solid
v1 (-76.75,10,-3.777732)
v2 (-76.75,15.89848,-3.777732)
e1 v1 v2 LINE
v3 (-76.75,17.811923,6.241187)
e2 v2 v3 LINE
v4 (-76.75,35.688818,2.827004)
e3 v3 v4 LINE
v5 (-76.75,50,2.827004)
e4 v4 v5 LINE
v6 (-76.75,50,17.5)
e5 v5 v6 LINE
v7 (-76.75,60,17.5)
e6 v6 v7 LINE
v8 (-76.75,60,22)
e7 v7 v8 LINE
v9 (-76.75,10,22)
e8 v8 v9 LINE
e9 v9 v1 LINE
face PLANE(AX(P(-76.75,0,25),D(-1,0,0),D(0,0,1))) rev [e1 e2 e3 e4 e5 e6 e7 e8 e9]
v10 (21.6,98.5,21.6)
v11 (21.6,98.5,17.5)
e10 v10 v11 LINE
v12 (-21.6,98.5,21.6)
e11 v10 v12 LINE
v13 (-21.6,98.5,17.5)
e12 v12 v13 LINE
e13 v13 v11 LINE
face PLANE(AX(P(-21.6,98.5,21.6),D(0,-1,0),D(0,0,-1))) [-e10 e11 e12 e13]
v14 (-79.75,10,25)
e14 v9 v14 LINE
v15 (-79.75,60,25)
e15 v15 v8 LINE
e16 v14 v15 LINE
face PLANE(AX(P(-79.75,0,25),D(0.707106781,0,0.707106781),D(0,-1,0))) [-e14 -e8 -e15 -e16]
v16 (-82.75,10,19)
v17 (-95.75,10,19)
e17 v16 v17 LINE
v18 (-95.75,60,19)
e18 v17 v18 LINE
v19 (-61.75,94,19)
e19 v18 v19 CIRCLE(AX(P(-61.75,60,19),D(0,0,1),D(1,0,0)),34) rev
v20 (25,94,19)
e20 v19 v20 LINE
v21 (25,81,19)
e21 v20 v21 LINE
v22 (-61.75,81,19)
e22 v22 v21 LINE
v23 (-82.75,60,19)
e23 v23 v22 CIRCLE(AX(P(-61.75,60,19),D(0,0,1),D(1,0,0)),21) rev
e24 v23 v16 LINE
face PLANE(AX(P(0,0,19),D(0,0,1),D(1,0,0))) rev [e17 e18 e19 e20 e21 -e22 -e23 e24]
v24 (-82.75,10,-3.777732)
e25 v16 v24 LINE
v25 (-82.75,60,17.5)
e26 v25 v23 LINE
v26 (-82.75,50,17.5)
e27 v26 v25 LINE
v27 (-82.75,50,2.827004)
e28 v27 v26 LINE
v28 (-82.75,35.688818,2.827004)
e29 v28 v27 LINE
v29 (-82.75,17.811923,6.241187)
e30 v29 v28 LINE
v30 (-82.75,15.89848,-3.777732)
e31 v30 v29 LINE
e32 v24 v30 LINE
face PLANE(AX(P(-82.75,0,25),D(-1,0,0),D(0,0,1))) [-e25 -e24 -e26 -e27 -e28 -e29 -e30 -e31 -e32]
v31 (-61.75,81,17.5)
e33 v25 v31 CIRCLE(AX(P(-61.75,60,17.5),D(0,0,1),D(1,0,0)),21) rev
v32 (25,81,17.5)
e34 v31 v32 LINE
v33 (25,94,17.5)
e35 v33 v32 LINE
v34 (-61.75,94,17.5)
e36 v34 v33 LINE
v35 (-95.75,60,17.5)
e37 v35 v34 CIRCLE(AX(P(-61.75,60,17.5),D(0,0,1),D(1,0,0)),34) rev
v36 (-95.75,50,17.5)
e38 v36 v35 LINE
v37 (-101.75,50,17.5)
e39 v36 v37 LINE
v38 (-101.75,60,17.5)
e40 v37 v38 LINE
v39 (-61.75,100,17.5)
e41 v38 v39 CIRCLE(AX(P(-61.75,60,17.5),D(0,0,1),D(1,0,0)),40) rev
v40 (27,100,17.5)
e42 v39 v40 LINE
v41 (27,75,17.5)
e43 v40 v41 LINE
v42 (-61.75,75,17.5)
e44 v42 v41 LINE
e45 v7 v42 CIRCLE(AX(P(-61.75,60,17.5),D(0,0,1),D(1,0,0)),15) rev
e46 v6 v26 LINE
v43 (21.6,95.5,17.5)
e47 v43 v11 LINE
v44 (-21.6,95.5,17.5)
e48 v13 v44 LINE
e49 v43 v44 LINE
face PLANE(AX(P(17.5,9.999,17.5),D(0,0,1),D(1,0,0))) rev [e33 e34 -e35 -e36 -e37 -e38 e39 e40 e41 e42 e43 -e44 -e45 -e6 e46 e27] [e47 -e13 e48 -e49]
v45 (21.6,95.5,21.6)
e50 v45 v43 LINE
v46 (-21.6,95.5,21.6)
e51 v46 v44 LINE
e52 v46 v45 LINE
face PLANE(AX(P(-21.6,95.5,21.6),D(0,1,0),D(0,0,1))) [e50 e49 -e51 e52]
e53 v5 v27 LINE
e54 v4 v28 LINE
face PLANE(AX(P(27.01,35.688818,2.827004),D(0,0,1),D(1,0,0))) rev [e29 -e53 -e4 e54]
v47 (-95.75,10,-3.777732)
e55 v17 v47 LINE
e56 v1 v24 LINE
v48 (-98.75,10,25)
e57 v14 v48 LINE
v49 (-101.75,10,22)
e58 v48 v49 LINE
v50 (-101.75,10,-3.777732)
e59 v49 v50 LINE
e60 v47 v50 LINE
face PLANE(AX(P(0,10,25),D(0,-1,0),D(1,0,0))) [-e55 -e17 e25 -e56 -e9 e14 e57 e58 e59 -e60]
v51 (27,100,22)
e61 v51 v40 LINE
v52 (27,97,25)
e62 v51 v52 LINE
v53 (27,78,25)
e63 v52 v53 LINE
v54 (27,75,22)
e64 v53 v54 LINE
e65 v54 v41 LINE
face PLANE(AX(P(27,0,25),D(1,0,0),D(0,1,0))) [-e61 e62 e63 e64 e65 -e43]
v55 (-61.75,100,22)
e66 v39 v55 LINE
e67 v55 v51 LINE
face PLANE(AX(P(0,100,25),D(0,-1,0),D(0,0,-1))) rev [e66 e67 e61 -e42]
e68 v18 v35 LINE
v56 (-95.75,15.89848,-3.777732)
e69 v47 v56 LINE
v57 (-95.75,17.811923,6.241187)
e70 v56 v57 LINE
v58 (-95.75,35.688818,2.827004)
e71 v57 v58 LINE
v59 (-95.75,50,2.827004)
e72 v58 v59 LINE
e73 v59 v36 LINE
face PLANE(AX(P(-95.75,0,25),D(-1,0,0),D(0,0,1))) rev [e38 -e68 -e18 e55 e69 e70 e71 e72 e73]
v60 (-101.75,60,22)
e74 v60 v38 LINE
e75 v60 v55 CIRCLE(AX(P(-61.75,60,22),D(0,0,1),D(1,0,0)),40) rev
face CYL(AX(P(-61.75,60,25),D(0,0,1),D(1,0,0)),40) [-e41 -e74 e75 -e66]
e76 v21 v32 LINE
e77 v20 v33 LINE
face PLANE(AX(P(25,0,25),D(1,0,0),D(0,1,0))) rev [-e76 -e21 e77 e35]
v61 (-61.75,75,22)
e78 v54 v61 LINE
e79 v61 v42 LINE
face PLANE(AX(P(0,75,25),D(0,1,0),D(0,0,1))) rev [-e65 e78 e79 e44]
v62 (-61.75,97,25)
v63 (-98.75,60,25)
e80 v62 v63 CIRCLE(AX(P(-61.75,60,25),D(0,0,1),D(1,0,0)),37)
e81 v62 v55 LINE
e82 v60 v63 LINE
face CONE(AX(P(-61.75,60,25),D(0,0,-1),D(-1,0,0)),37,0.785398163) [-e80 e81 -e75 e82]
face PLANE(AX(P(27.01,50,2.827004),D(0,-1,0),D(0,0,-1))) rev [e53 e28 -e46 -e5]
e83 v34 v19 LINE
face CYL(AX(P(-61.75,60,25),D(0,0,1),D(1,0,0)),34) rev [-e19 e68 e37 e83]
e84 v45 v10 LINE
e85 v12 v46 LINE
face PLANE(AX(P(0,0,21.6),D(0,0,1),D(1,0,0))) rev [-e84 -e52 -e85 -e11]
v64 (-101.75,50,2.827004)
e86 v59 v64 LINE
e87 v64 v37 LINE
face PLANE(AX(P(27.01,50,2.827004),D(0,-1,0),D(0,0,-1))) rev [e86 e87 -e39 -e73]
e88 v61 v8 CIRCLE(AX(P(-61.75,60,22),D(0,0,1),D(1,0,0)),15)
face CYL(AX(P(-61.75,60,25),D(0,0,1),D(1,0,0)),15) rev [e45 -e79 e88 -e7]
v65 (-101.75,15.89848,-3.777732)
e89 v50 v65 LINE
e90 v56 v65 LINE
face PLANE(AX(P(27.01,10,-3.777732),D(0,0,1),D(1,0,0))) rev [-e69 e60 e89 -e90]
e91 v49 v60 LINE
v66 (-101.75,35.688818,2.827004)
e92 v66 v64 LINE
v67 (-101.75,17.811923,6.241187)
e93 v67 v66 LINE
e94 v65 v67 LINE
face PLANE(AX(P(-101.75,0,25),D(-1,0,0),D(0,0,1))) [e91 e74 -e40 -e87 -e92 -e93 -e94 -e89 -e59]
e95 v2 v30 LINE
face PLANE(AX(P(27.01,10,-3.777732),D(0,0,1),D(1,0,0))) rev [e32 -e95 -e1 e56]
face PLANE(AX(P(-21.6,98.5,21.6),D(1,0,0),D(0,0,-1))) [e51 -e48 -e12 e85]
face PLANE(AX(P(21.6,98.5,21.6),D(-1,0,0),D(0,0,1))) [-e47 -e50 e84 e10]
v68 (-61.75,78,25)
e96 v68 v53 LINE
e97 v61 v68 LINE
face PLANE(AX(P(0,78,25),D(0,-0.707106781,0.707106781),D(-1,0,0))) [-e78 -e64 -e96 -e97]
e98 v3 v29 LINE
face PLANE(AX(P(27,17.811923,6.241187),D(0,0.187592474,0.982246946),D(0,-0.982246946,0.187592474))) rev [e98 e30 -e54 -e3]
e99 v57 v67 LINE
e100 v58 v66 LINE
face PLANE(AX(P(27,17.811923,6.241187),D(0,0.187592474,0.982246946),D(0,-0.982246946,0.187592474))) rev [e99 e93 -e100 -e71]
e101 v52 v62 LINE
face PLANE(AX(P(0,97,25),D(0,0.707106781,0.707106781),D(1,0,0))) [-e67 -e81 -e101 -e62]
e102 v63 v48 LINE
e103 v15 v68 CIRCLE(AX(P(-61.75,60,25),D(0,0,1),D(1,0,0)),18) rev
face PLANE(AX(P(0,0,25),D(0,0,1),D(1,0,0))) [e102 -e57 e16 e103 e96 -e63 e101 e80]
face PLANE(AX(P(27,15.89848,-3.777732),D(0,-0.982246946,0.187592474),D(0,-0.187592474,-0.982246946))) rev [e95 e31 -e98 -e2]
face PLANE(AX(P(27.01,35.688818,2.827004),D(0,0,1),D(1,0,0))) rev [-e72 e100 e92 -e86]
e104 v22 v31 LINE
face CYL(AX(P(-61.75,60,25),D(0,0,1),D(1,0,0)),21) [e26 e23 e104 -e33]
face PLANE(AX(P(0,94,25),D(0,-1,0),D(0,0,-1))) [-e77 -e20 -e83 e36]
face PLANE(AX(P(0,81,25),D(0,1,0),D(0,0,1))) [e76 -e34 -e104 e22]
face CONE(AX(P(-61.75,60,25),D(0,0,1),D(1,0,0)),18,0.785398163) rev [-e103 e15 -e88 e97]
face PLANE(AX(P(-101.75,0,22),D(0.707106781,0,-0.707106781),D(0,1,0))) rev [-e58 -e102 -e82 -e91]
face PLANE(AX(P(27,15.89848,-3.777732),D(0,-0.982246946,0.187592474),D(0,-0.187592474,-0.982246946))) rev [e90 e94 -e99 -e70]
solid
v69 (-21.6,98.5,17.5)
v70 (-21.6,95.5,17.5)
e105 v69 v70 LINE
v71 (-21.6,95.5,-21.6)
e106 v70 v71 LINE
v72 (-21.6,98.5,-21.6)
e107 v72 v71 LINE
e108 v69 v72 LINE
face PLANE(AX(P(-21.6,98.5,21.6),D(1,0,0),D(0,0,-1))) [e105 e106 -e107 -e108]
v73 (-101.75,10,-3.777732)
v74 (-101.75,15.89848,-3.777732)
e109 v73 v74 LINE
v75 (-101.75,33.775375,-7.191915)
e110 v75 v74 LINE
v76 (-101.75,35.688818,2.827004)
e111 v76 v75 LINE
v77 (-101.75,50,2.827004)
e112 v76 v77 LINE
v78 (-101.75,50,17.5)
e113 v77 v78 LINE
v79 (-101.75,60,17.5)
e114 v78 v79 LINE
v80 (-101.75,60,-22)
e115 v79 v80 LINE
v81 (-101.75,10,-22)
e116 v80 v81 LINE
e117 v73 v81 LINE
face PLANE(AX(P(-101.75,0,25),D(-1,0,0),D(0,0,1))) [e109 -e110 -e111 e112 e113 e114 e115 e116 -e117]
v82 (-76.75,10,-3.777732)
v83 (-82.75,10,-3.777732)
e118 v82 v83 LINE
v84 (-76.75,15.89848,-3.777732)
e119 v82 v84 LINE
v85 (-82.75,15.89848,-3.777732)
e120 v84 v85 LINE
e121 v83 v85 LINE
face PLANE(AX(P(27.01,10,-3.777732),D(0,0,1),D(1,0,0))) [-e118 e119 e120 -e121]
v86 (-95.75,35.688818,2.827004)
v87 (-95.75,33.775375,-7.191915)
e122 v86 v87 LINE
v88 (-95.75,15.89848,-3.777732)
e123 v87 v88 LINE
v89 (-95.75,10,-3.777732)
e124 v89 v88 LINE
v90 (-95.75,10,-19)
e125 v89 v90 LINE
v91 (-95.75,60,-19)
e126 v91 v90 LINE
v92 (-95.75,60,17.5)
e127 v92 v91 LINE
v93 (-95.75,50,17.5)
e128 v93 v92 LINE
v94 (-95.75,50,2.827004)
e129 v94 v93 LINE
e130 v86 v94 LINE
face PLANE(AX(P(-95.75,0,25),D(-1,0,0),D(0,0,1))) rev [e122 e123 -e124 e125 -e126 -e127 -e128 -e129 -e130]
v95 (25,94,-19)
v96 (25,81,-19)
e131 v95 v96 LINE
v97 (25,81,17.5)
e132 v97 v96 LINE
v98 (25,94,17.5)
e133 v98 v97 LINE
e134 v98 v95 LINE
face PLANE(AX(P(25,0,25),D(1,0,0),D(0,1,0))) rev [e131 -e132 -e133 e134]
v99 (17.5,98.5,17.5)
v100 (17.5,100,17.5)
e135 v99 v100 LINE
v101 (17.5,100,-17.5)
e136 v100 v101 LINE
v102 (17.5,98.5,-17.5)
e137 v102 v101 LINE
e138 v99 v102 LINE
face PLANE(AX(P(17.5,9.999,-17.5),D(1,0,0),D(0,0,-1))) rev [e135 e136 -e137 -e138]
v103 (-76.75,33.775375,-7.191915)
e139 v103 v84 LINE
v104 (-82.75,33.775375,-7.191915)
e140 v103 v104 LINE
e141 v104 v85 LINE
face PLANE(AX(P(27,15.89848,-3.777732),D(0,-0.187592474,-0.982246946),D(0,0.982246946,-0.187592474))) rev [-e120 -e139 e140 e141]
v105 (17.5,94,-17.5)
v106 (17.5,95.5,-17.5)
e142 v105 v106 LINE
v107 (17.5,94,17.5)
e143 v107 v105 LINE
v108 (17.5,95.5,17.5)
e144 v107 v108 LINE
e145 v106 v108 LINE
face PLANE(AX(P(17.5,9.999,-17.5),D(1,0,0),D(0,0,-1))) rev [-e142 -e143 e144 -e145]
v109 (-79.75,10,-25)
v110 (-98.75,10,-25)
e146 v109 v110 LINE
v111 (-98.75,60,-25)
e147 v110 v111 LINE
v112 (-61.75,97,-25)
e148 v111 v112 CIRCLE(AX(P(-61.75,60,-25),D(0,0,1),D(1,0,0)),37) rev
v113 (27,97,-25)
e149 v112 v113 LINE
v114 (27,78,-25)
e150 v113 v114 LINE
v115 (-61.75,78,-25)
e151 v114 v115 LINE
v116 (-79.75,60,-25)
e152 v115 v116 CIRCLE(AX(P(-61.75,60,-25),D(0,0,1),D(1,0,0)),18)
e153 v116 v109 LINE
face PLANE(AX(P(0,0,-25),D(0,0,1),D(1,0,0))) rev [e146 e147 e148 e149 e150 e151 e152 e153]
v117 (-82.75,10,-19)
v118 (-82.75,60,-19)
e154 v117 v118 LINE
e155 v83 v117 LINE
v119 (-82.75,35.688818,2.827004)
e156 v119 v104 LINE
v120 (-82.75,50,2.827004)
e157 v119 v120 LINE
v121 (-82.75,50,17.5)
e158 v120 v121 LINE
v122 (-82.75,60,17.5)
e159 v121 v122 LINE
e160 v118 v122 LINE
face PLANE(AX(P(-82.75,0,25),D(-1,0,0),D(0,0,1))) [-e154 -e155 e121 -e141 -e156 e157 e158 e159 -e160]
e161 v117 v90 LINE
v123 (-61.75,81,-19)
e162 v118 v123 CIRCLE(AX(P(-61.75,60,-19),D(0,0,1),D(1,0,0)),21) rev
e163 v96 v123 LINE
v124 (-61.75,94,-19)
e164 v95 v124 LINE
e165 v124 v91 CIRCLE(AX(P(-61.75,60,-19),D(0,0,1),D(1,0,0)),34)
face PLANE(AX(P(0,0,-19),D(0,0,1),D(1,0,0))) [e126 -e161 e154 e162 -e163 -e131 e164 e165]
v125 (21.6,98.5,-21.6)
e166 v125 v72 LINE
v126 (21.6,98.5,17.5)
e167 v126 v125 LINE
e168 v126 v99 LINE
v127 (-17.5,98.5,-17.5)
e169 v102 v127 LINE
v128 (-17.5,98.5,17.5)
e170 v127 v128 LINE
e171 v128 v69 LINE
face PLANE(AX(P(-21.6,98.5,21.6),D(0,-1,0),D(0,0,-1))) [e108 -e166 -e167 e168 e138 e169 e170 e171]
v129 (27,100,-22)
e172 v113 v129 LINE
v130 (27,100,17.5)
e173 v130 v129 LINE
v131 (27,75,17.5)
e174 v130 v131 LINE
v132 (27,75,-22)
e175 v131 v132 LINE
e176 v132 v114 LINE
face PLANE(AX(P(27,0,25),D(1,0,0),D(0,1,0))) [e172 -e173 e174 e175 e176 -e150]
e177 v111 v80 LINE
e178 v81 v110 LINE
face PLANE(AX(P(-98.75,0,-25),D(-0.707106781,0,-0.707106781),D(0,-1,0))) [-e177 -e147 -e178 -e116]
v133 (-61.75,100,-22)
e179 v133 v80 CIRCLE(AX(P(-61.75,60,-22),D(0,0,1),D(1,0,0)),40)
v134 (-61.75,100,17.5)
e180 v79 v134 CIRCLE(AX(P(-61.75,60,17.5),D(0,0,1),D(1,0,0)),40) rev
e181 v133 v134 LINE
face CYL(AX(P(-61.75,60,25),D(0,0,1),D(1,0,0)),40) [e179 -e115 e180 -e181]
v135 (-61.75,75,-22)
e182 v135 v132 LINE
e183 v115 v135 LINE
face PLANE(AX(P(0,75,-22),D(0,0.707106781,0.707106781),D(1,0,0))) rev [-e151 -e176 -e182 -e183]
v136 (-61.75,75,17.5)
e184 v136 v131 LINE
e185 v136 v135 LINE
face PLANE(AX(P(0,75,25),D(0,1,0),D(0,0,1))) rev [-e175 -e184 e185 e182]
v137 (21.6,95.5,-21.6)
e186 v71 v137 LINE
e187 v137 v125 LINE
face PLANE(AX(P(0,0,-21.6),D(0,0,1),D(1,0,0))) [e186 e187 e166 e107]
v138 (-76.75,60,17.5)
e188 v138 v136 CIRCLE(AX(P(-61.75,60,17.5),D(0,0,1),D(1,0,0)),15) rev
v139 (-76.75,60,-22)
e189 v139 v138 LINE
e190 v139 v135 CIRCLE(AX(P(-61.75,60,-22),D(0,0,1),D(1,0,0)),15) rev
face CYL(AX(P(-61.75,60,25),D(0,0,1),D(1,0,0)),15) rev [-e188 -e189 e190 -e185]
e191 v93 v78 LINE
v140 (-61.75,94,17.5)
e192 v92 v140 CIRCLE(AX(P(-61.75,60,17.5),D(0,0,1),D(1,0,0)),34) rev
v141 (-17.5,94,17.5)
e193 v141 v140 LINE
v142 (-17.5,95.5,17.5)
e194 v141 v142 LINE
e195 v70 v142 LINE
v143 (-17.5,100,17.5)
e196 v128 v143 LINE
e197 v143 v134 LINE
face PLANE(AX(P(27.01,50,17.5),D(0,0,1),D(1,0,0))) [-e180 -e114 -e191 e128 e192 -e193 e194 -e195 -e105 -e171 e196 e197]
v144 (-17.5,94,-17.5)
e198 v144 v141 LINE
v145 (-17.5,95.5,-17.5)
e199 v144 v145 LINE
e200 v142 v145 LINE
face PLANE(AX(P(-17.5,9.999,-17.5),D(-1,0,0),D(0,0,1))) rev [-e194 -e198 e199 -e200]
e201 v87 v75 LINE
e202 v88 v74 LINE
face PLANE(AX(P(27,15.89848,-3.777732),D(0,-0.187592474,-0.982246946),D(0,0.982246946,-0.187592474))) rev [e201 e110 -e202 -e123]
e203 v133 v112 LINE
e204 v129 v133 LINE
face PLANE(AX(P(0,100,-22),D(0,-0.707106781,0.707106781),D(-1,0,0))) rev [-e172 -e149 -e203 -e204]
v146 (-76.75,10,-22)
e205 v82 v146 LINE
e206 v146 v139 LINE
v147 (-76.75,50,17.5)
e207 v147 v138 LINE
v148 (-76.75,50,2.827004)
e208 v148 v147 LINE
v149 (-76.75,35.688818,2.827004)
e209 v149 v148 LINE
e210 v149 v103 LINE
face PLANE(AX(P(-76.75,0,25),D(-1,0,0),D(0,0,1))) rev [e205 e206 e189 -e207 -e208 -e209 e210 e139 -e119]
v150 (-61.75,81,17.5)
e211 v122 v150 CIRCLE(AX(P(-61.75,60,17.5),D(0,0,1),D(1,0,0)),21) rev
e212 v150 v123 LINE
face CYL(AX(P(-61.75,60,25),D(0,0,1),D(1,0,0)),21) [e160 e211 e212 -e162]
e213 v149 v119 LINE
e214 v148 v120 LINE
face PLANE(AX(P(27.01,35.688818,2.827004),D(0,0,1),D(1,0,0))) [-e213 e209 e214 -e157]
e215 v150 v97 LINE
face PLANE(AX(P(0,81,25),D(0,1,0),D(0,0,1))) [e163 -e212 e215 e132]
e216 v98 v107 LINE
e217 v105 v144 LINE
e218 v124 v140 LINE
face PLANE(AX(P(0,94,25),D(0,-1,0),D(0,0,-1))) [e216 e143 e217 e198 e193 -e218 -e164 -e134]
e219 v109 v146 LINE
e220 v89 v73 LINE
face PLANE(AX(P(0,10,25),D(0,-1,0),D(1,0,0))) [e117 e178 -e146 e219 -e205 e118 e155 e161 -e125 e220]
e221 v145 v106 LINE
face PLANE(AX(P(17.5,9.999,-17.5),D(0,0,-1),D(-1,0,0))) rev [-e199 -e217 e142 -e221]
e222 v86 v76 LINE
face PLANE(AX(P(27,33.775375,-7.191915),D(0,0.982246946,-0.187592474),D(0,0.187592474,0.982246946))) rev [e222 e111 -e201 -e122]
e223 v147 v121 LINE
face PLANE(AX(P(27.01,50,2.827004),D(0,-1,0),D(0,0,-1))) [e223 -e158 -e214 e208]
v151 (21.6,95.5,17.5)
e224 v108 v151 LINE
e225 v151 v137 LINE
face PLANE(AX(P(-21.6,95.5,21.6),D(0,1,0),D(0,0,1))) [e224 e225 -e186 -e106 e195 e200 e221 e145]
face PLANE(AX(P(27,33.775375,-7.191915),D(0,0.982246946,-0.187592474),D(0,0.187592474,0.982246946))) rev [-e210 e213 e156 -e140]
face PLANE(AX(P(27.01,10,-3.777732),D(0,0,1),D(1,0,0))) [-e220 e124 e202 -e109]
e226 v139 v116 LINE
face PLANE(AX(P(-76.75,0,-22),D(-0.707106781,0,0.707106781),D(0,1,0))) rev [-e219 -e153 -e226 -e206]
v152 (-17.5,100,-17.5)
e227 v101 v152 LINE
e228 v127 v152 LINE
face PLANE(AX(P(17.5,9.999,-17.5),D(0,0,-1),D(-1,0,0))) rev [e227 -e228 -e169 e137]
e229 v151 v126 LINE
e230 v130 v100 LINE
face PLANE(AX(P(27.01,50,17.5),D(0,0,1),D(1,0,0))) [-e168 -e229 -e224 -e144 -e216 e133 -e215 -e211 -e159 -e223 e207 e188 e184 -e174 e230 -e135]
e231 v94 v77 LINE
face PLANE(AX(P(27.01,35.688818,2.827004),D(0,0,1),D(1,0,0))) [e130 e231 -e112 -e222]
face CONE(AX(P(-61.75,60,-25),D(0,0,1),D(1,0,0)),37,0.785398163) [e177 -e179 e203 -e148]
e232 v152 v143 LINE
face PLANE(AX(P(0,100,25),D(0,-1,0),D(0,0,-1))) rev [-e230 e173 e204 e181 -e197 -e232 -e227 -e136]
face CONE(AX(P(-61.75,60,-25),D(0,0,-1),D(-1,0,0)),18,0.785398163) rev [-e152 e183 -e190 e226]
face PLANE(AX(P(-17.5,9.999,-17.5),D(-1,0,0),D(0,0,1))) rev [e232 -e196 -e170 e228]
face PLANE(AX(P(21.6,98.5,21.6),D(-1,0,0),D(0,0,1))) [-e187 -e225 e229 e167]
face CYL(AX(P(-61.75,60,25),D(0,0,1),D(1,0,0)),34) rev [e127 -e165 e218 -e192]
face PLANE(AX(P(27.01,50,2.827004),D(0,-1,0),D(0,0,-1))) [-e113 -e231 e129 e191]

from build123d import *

# Parameters (mm, degrees)
BOSS_EXTRUDE1_DEPTH       = 25
FILLET2_R                 = 15
FILLET3_R                 = 40
FILLET1_SIZE              = 3
SHELL1_T                  = -6
SHELL1_THICKNESS_2_FACE_W = 13
SHELL1_THICKNESS_2_FACE_H = 38
SHELL1_THICKNESS_2_DEPTH  = 4
CUT_EXTRUDE1_DEPTH        = 165.928961981
CUT_EXTRUDE2_REACH        = 140.123
SKETCH3_W                 = 35
SKETCH3_H                 = 35
CUT_EXTRUDE3_DEPTH        = 39.1
CUT_EXTRUDE3_DEPTH_BACK   = 4.1
SKETCH4_W                 = 43.2
SKETCH4_H                 = 3
SPLIT1_SURFACE_1_BACK     = 165.853
SPLIT1_SURFACE_1_DEPTH    = 331.706
SPLIT1_SURFACE_2_BACK     = 165.853
SPLIT1_SURFACE_2_DEPTH    = 331.706


with BuildPart() as part:
    # Sketch1 → Boss-Extrude1 (new, symmetric)
    with BuildSketch(Plane.XY):
        Polygon((-101.75, 10), (-76.75, 10), (-76.75, 75), (27, 75), (27, 100), (-101.75, 100), align=None)
    extrude(amount=BOSS_EXTRUDE1_DEPTH, both=True)

    # Fillet2
    fillet2_edges = [part.edges().sort_by_distance(p)[0] for p in [
        (-76.75, 75, 0),
    ]]
    fillet(fillet2_edges, radius=FILLET2_R)

    # Fillet3
    fillet3_edges = [part.edges().sort_by_distance(p)[0] for p in [
        (-101.75, 100, 0),
    ]]
    fillet(fillet3_edges, radius=FILLET3_R)

    # Fillet1
    fillet1_edges = [part.edges().sort_by_distance(p)[0] for p in [
        (-17.375, 75, -25),
        (-17.375, 100, -25),
        (-17.375, 100, 25),
        (-17.375, 75, 25),
        (-101.75, 35, -25),
        (-101.75, 35, 25),
        (-76.75, 35, -25),
        (-76.75, 35, 25),
        (-90.034271247, 88.284271247, -25),
        (-90.034271247, 88.284271247, 25),
        (-72.356601718, 70.606601718, -25),
        (-72.356601718, 70.606601718, 25),
    ]]
    chamfer(fillet1_edges, length=FILLET1_SIZE)

    # Shell1
    shell1_openings = [part.faces().sort_by_distance(p)[0] for p in [
        (-89.25, 10, 0),
    ]]
    offset(amount=SHELL1_T, openings=shell1_openings)

    # Shell1 thickness 2 face (on inner face of the shell) → Shell1 thickness 2 (cut)
    with BuildSketch(Plane(origin=(21, 87.5, 0), x_dir=(0, 1, 0), z_dir=(1, 0, 0))):
        Rectangle(SHELL1_THICKNESS_2_FACE_W, SHELL1_THICKNESS_2_FACE_H)
    extrude(amount=SHELL1_THICKNESS_2_DEPTH, mode=Mode.SUBTRACT)

    # Sketch2 → Cut-Extrude1 (cut, through all)
    with BuildSketch(Plane.ZY.offset(101.75)):
        Polygon((-3.777731527, 15.89847996), (6.241187326, 17.811923196), (2.827004193, 35.688818166), (-7.19191466, 33.77537493), align=None)
    extrude(amount=-CUT_EXTRUDE1_DEPTH, mode=Mode.SUBTRACT)

    # Sketch3 → Cut-Extrude2 (cut, up to next)
    with BuildSketch(Plane(origin=(0, 100, 0), x_dir=(1, 0, 0), z_dir=(0, 1, 0)), mode=Mode.PRIVATE) as cut_extrude2_sk1:
        Rectangle(SKETCH3_W, SKETCH3_H)
    cut_extrude2_tool1 = extrude(cut_extrude2_sk1.sketch, amount=-CUT_EXTRUDE2_REACH, mode=Mode.PRIVATE) & part.part
    add(cut_extrude2_tool1.solids().sort_by_distance((0, 100, 0))[0], mode=Mode.SUBTRACT)

    # Sketch4 → Cut-Extrude3 (cut, two sides: drawn at the far end of the back side and taken through both)
    with BuildSketch(Plane.XY.offset(-17.5).offset(-CUT_EXTRUDE3_DEPTH_BACK)):
        with Locations((0, 97)):
            Rectangle(SKETCH4_W, SKETCH4_H)
    extrude(amount=CUT_EXTRUDE3_DEPTH + CUT_EXTRUDE3_DEPTH_BACK, mode=Mode.SUBTRACT)


with BuildPart() as body_2:
    # Split1: the piece behind the surface
    add(part.part)
    # Split1 surface: a surface, the sketch's curves swept straight by 331.706 mm
    with BuildLine(Plane.ZY.offset(101.75).offset(-SPLIT1_SURFACE_1_BACK), mode=Mode.PRIVATE) as split1_surface_1_path:
        Line((-3.777731527, 10), (-3.777731527, 15.89847996))
        Line((-3.777731527, 15.89847996), (2.827004193, 35.688818166))
        Line((2.827004193, 35.688818166), (2.827004193, 50))
        Line((2.827004193, 50), (17.5, 50))
        Line((17.5, 50), (17.5, 116.794705416))
    split1_surface_1 = Shell.extrude(split1_surface_1_path.wire(), (-1 * SPLIT1_SURFACE_1_DEPTH, 0 * SPLIT1_SURFACE_1_DEPTH, 0 * SPLIT1_SURFACE_1_DEPTH))
    split(bisect_by=split1_surface_1, keep=Keep.BOTTOM)


with BuildPart() as part_1:
    add(part.part)

    # Split1: split by a surface, the side it looks to stays
    # Split1 surface: a surface, the sketch's curves swept straight by 331.706 mm
    with BuildLine(Plane.ZY.offset(101.75).offset(-SPLIT1_SURFACE_2_BACK), mode=Mode.PRIVATE) as split1_surface_2_path:
        Line((-3.777731527, 10), (-3.777731527, 15.89847996))
        Line((-3.777731527, 15.89847996), (2.827004193, 35.688818166))
        Line((2.827004193, 35.688818166), (2.827004193, 50))
        Line((2.827004193, 50), (17.5, 50))
        Line((17.5, 50), (17.5, 116.794705416))
    split1_surface_2 = Shell.extrude(split1_surface_2_path.wire(), (-1 * SPLIT1_SURFACE_2_DEPTH, 0 * SPLIT1_SURFACE_2_DEPTH, 0 * SPLIT1_SURFACE_2_DEPTH))
    split(bisect_by=split1_surface_2, keep=Keep.TOP)


solid = Compound([body_2.part, part_1.part])
